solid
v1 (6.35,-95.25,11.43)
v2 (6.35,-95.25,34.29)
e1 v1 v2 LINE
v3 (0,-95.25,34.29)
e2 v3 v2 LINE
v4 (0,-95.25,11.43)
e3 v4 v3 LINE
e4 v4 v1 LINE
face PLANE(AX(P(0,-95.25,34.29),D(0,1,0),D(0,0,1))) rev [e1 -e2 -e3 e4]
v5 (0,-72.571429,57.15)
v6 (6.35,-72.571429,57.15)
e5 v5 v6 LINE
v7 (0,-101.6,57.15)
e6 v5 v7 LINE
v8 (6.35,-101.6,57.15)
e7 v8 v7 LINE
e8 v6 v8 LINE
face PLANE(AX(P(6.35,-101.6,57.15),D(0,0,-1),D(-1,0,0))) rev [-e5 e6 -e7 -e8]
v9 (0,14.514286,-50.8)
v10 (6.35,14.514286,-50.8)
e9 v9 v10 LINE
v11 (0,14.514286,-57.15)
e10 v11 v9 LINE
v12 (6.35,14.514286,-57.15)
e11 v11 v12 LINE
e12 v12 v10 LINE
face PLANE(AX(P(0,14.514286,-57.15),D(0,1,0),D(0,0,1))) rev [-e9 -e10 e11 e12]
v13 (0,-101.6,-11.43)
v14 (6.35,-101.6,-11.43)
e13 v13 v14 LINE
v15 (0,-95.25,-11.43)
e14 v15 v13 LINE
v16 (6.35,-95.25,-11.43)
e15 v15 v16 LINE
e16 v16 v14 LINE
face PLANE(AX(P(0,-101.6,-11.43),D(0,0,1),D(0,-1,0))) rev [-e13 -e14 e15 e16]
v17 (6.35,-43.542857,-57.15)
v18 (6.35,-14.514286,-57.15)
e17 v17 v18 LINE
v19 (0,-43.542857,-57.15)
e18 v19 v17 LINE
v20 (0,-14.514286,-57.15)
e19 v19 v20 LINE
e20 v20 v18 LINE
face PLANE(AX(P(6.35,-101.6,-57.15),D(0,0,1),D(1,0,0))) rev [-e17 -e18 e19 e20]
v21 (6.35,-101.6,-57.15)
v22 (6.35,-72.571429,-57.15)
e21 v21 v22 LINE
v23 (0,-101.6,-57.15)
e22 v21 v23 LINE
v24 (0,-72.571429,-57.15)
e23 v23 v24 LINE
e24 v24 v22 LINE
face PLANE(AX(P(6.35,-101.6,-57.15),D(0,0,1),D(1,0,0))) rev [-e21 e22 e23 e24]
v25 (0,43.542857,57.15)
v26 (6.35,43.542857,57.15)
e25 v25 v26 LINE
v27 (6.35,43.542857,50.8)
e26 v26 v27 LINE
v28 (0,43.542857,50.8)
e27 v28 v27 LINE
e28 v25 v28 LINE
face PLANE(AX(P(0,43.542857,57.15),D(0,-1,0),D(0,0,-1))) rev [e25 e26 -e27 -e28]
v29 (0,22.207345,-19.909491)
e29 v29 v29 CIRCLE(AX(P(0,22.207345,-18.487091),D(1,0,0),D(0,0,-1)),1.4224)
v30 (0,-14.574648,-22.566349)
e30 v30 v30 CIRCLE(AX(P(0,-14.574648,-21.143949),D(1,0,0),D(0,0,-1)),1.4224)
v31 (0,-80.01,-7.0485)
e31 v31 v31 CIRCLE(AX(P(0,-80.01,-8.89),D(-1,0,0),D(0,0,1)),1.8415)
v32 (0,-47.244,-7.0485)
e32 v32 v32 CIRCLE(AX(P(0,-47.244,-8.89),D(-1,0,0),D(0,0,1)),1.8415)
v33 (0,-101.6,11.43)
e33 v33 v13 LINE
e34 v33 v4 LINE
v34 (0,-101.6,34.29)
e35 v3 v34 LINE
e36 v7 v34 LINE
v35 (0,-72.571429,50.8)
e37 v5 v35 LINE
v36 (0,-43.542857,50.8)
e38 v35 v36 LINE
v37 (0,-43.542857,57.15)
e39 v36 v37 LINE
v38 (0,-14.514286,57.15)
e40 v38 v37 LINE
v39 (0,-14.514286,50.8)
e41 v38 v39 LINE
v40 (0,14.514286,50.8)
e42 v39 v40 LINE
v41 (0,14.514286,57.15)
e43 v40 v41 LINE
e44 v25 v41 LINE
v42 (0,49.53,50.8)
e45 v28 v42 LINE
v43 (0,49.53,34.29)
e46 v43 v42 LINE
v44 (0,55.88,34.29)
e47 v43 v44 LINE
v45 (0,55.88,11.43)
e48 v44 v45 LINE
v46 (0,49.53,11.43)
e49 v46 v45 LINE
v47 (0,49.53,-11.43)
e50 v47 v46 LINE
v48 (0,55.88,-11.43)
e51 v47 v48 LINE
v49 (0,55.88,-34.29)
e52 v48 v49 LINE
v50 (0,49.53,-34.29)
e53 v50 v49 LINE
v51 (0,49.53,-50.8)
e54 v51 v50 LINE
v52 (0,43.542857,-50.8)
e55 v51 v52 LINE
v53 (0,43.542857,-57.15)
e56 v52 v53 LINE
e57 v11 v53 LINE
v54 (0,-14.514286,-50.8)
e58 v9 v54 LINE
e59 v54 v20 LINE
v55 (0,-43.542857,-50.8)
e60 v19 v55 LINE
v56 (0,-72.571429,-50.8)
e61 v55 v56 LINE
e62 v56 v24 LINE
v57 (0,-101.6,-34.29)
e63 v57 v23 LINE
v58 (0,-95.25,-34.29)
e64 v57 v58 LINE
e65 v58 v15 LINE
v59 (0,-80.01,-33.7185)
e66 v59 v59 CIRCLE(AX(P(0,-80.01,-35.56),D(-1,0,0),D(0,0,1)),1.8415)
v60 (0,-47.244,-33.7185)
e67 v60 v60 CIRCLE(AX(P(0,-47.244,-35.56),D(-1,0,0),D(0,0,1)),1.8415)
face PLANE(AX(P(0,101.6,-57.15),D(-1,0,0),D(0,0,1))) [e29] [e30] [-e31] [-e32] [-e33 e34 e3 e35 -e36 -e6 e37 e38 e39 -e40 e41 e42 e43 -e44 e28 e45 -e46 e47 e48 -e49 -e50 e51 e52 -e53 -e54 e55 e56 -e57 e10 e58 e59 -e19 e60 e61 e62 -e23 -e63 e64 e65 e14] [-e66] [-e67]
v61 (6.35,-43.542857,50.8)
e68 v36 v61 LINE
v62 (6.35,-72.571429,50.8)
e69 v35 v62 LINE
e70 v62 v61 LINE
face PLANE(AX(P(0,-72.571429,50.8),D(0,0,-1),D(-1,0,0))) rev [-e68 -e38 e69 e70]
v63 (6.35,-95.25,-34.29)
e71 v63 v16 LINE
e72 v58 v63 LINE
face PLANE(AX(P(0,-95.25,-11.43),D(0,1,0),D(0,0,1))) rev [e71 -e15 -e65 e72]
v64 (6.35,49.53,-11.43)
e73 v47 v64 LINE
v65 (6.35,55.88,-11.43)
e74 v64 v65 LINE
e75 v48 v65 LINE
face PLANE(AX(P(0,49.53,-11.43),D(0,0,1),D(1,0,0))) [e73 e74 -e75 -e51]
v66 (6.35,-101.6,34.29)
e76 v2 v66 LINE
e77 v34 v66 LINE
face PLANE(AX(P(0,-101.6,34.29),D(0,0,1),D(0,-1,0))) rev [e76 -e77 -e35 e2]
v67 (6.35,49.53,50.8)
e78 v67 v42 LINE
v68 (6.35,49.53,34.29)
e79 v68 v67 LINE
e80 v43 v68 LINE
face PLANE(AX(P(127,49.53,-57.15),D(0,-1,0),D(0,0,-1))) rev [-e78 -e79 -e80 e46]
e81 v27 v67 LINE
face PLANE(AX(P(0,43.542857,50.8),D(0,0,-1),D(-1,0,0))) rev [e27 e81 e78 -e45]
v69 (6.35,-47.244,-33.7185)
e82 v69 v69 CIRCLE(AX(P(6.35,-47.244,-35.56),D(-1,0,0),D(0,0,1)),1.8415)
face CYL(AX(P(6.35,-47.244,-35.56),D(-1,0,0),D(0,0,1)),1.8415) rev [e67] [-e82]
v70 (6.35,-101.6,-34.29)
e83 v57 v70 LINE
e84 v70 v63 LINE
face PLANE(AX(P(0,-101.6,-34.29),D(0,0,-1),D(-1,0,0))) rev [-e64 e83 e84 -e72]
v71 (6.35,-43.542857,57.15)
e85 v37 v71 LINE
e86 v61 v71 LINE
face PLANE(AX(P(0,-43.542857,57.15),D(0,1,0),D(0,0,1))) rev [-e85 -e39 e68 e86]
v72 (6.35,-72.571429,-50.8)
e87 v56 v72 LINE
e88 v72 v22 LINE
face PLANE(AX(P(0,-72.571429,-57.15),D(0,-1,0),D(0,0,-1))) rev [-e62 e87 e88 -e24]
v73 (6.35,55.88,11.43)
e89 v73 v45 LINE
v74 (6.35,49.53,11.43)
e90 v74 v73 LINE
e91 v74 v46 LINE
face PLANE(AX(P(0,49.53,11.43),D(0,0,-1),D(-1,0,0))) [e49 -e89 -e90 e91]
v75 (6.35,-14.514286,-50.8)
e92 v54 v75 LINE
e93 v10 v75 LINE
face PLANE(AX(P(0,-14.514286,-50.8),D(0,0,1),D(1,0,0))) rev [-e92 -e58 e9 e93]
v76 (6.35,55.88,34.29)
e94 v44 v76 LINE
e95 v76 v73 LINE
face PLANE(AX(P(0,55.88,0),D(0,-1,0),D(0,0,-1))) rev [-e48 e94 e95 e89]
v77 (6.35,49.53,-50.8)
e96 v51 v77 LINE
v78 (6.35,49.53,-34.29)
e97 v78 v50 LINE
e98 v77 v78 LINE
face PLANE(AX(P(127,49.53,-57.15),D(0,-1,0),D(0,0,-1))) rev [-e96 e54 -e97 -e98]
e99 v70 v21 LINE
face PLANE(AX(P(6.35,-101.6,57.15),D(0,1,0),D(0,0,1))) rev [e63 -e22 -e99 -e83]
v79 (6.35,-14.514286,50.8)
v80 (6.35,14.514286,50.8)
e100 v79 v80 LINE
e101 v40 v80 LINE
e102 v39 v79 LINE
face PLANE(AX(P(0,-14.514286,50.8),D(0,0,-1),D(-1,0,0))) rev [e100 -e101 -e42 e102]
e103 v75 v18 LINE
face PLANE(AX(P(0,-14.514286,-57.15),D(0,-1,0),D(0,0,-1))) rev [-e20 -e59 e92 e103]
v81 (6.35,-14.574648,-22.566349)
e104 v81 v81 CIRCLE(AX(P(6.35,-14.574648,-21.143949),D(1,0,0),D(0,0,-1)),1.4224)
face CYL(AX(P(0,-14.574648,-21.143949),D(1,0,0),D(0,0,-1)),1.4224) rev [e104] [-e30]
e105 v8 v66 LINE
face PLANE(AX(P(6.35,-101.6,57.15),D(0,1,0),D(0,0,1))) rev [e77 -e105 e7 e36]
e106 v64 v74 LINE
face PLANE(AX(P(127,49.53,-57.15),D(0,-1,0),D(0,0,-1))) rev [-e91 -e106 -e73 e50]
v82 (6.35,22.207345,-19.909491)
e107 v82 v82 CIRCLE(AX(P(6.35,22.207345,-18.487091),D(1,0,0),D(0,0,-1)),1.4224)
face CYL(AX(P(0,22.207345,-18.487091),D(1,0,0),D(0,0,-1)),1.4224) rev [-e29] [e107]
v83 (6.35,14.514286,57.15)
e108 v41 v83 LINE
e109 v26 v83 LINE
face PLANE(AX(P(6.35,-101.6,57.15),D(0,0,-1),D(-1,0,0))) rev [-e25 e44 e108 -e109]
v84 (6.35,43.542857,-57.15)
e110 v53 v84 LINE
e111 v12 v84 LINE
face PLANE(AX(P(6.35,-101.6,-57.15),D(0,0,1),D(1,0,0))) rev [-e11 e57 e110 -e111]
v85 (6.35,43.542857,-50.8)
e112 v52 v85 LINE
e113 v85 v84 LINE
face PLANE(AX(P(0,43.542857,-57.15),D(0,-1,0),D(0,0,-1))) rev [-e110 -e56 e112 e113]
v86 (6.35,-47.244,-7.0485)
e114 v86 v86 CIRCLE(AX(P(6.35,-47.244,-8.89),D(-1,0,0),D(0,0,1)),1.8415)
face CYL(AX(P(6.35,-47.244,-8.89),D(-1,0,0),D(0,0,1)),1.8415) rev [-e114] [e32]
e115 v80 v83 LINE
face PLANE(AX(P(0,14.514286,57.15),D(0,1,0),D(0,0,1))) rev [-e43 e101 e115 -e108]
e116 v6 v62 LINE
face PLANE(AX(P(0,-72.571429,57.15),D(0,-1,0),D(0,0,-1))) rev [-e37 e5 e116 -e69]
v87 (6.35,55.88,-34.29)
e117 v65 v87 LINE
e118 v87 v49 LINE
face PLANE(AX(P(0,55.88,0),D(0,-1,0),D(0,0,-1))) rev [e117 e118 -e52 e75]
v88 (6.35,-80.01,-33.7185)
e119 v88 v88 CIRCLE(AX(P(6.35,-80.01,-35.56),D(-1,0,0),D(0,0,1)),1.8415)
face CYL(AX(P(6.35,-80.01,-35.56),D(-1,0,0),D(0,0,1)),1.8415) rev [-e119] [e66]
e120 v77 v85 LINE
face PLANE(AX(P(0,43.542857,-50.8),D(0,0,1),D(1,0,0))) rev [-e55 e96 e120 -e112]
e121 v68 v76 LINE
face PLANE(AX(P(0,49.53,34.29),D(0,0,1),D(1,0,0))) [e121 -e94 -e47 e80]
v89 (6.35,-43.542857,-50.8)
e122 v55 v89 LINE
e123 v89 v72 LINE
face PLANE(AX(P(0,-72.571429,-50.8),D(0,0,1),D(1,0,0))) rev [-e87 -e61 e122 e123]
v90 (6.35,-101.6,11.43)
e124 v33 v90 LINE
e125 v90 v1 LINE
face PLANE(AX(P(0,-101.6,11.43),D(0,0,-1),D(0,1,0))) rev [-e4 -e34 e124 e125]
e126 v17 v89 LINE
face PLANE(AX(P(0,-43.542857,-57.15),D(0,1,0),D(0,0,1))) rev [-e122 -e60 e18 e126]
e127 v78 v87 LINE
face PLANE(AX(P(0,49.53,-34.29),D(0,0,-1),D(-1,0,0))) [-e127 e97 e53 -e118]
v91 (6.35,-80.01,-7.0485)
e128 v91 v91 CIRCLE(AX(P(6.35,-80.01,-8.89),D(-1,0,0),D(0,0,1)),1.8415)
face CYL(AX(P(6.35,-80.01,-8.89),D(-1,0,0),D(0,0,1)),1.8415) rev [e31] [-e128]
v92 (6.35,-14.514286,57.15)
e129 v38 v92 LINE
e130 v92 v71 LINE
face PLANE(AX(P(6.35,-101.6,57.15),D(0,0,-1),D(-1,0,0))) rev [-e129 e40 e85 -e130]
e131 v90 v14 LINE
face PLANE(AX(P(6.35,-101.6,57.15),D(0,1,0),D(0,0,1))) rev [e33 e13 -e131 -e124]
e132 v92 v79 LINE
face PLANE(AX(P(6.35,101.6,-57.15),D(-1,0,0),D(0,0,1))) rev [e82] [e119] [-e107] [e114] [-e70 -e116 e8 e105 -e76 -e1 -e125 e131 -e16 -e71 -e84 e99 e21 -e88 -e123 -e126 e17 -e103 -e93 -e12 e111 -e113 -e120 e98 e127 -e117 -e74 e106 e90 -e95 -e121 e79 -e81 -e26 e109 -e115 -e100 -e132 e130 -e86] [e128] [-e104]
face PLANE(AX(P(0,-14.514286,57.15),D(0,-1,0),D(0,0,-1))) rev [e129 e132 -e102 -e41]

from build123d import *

# Parameters (mm, degrees)
SKETCH1_W           = 114.3
SKETCH1_H           = 203.2
BOSS_EXTRUDE1_DEPTH = 6.35
SKETCH3_W           = 6.35
SKETCH3_H           = 29.028571428
CUT_EXTRUDE4_DEPTH  = 117.743329574
SKETCH5_W           = 22.86
SKETCH5_H           = 6.35
CUT_EXTRUDE5_DEPTH  = 117.743329574
CUT_EXTRUDE6_DEPTH  = 117.743329574
CAVITY1_START       = -11.43
CAVITY1_OUTLINE_W   = 6.35
CAVITY1_OUTLINE_H   = 6.35
CAVITY1_DEPTH       = 22.86
CAVITY1_START_2     = -50.8
CAVITY1_2_OUTLINE_W = 6.35
CAVITY1_2_OUTLINE_H = 6.35
CAVITY1_2_DEPTH     = 16.51
CAVITY1_START_3     = 34.29
CAVITY1_3_OUTLINE_W = 6.35
CAVITY1_3_OUTLINE_H = 6.35
CAVITY1_3_DEPTH     = 16.51
SKETCH7_R           = 1.4224
CUT_EXTRUDE7_DEPTH  = 117.743329574
SKETCH8_R           = 1.8415
CUT_EXTRUDE8_DEPTH  = 117.743329574


# Read off the part's stored shape, not the designer's step: Cavity1
with BuildPart() as part:
    # Sketch1 → Boss-Extrude1 (new body)
    with BuildSketch(Plane(origin=(0, 0, 0), x_dir=(0, 0, -1), z_dir=(1, 0, 0))):
        Rectangle(SKETCH1_W, SKETCH1_H)
    extrude(amount=BOSS_EXTRUDE1_DEPTH)

    # Sketch3 → Cut-Extrude4 (cut, through all)
    with BuildSketch(Plane(origin=(6.35, 0, 0), x_dir=(0, 0, -1), z_dir=(1, 0, 0))):
        with Locations((-53.975, -58.057142857)):
            Rectangle(SKETCH3_W, SKETCH3_H)
        with Locations((-53.975, 0)):
            Rectangle(SKETCH3_W, SKETCH3_H)
        with Locations((-53.975, 58.057142857)):
            Rectangle(SKETCH3_W, SKETCH3_H)
        with Locations((53.975, 58.057142857)):
            Rectangle(SKETCH3_W, SKETCH3_H)
        with Locations((53.975, 0)):
            Rectangle(SKETCH3_W, SKETCH3_H)
        with Locations((53.975, -58.057142857)):
            Rectangle(SKETCH3_W, SKETCH3_H)
    extrude(amount=-CUT_EXTRUDE4_DEPTH, mode=Mode.SUBTRACT)

    # Sketch5 → Cut-Extrude5 (cut, through all)
    with BuildSketch(Plane(origin=(6.35, 0, 0), x_dir=(0, 0, -1), z_dir=(1, 0, 0))):
        with Locations((-22.86, -98.425)):
            Rectangle(SKETCH5_W, SKETCH5_H)
        with Locations((22.86, -98.425)):
            Rectangle(SKETCH5_W, SKETCH5_H)
    extrude(amount=-CUT_EXTRUDE5_DEPTH, mode=Mode.SUBTRACT)

    # Sketch6 → Cut-Extrude6 (cut, through all)
    with BuildSketch(Plane(origin=(6.35, 0, 0), x_dir=(0, 0, -1), z_dir=(1, 0, 0))):
        Polygon((0, 55.88), (50.8, 55.88), (50.8, 72.571428571), (57.15, 72.571428571), (57.15, 101.6), (-57.15, 101.6), (-57.15, 72.571428571), (-50.8, 72.571428571), (-50.8, 55.88), align=None)
    extrude(amount=-CUT_EXTRUDE6_DEPTH, mode=Mode.SUBTRACT)

    # Cavity1 outline → Cavity1 (cut)
    with BuildSketch(Plane.XY.offset(CAVITY1_START)):
        with Locations((3.175, 52.705)):
            Rectangle(CAVITY1_OUTLINE_W, CAVITY1_OUTLINE_H)
    extrude(amount=CAVITY1_DEPTH, mode=Mode.SUBTRACT)

    # Cavity1 2 outline → Cavity1 2 (cut)
    with BuildSketch(Plane.XY.offset(CAVITY1_START_2)):
        with Locations((3.175, 52.705)):
            Rectangle(CAVITY1_2_OUTLINE_W, CAVITY1_2_OUTLINE_H)
    extrude(amount=CAVITY1_2_DEPTH, mode=Mode.SUBTRACT)

    # Cavity1 3 outline → Cavity1 3 (cut)
    with BuildSketch(Plane.XY.offset(CAVITY1_START_3)):
        with Locations((3.175, 52.705)):
            Rectangle(CAVITY1_3_OUTLINE_W, CAVITY1_3_OUTLINE_H)
    extrude(amount=CAVITY1_3_DEPTH, mode=Mode.SUBTRACT)

    # Sketch7 → Cut-Extrude7 (cut, through all)
    with BuildSketch(Plane(origin=(6.35, 0, 0), x_dir=(0, 0, -1), z_dir=(1, 0, 0))):
        with Locations((18.487090642, 22.207344877)):
            Circle(SKETCH7_R)
        with Locations((21.143949011, -14.574648396)):
            Circle(SKETCH7_R)
    extrude(amount=-CUT_EXTRUDE7_DEPTH, mode=Mode.SUBTRACT)

    # Sketch8 → Cut-Extrude8 (cut, through all)
    with BuildSketch(Plane.ZY):
        with Locations((-35.56, -47.244)):
            Circle(SKETCH8_R)
        with Locations((-8.89, -47.244)):
            Circle(SKETCH8_R)
        with Locations((-35.56, -80.01)):
            Circle(SKETCH8_R)
        with Locations((-8.89, -80.01)):
            Circle(SKETCH8_R)
    extrude(amount=-CUT_EXTRUDE8_DEPTH, mode=Mode.SUBTRACT)


solid = part.part
